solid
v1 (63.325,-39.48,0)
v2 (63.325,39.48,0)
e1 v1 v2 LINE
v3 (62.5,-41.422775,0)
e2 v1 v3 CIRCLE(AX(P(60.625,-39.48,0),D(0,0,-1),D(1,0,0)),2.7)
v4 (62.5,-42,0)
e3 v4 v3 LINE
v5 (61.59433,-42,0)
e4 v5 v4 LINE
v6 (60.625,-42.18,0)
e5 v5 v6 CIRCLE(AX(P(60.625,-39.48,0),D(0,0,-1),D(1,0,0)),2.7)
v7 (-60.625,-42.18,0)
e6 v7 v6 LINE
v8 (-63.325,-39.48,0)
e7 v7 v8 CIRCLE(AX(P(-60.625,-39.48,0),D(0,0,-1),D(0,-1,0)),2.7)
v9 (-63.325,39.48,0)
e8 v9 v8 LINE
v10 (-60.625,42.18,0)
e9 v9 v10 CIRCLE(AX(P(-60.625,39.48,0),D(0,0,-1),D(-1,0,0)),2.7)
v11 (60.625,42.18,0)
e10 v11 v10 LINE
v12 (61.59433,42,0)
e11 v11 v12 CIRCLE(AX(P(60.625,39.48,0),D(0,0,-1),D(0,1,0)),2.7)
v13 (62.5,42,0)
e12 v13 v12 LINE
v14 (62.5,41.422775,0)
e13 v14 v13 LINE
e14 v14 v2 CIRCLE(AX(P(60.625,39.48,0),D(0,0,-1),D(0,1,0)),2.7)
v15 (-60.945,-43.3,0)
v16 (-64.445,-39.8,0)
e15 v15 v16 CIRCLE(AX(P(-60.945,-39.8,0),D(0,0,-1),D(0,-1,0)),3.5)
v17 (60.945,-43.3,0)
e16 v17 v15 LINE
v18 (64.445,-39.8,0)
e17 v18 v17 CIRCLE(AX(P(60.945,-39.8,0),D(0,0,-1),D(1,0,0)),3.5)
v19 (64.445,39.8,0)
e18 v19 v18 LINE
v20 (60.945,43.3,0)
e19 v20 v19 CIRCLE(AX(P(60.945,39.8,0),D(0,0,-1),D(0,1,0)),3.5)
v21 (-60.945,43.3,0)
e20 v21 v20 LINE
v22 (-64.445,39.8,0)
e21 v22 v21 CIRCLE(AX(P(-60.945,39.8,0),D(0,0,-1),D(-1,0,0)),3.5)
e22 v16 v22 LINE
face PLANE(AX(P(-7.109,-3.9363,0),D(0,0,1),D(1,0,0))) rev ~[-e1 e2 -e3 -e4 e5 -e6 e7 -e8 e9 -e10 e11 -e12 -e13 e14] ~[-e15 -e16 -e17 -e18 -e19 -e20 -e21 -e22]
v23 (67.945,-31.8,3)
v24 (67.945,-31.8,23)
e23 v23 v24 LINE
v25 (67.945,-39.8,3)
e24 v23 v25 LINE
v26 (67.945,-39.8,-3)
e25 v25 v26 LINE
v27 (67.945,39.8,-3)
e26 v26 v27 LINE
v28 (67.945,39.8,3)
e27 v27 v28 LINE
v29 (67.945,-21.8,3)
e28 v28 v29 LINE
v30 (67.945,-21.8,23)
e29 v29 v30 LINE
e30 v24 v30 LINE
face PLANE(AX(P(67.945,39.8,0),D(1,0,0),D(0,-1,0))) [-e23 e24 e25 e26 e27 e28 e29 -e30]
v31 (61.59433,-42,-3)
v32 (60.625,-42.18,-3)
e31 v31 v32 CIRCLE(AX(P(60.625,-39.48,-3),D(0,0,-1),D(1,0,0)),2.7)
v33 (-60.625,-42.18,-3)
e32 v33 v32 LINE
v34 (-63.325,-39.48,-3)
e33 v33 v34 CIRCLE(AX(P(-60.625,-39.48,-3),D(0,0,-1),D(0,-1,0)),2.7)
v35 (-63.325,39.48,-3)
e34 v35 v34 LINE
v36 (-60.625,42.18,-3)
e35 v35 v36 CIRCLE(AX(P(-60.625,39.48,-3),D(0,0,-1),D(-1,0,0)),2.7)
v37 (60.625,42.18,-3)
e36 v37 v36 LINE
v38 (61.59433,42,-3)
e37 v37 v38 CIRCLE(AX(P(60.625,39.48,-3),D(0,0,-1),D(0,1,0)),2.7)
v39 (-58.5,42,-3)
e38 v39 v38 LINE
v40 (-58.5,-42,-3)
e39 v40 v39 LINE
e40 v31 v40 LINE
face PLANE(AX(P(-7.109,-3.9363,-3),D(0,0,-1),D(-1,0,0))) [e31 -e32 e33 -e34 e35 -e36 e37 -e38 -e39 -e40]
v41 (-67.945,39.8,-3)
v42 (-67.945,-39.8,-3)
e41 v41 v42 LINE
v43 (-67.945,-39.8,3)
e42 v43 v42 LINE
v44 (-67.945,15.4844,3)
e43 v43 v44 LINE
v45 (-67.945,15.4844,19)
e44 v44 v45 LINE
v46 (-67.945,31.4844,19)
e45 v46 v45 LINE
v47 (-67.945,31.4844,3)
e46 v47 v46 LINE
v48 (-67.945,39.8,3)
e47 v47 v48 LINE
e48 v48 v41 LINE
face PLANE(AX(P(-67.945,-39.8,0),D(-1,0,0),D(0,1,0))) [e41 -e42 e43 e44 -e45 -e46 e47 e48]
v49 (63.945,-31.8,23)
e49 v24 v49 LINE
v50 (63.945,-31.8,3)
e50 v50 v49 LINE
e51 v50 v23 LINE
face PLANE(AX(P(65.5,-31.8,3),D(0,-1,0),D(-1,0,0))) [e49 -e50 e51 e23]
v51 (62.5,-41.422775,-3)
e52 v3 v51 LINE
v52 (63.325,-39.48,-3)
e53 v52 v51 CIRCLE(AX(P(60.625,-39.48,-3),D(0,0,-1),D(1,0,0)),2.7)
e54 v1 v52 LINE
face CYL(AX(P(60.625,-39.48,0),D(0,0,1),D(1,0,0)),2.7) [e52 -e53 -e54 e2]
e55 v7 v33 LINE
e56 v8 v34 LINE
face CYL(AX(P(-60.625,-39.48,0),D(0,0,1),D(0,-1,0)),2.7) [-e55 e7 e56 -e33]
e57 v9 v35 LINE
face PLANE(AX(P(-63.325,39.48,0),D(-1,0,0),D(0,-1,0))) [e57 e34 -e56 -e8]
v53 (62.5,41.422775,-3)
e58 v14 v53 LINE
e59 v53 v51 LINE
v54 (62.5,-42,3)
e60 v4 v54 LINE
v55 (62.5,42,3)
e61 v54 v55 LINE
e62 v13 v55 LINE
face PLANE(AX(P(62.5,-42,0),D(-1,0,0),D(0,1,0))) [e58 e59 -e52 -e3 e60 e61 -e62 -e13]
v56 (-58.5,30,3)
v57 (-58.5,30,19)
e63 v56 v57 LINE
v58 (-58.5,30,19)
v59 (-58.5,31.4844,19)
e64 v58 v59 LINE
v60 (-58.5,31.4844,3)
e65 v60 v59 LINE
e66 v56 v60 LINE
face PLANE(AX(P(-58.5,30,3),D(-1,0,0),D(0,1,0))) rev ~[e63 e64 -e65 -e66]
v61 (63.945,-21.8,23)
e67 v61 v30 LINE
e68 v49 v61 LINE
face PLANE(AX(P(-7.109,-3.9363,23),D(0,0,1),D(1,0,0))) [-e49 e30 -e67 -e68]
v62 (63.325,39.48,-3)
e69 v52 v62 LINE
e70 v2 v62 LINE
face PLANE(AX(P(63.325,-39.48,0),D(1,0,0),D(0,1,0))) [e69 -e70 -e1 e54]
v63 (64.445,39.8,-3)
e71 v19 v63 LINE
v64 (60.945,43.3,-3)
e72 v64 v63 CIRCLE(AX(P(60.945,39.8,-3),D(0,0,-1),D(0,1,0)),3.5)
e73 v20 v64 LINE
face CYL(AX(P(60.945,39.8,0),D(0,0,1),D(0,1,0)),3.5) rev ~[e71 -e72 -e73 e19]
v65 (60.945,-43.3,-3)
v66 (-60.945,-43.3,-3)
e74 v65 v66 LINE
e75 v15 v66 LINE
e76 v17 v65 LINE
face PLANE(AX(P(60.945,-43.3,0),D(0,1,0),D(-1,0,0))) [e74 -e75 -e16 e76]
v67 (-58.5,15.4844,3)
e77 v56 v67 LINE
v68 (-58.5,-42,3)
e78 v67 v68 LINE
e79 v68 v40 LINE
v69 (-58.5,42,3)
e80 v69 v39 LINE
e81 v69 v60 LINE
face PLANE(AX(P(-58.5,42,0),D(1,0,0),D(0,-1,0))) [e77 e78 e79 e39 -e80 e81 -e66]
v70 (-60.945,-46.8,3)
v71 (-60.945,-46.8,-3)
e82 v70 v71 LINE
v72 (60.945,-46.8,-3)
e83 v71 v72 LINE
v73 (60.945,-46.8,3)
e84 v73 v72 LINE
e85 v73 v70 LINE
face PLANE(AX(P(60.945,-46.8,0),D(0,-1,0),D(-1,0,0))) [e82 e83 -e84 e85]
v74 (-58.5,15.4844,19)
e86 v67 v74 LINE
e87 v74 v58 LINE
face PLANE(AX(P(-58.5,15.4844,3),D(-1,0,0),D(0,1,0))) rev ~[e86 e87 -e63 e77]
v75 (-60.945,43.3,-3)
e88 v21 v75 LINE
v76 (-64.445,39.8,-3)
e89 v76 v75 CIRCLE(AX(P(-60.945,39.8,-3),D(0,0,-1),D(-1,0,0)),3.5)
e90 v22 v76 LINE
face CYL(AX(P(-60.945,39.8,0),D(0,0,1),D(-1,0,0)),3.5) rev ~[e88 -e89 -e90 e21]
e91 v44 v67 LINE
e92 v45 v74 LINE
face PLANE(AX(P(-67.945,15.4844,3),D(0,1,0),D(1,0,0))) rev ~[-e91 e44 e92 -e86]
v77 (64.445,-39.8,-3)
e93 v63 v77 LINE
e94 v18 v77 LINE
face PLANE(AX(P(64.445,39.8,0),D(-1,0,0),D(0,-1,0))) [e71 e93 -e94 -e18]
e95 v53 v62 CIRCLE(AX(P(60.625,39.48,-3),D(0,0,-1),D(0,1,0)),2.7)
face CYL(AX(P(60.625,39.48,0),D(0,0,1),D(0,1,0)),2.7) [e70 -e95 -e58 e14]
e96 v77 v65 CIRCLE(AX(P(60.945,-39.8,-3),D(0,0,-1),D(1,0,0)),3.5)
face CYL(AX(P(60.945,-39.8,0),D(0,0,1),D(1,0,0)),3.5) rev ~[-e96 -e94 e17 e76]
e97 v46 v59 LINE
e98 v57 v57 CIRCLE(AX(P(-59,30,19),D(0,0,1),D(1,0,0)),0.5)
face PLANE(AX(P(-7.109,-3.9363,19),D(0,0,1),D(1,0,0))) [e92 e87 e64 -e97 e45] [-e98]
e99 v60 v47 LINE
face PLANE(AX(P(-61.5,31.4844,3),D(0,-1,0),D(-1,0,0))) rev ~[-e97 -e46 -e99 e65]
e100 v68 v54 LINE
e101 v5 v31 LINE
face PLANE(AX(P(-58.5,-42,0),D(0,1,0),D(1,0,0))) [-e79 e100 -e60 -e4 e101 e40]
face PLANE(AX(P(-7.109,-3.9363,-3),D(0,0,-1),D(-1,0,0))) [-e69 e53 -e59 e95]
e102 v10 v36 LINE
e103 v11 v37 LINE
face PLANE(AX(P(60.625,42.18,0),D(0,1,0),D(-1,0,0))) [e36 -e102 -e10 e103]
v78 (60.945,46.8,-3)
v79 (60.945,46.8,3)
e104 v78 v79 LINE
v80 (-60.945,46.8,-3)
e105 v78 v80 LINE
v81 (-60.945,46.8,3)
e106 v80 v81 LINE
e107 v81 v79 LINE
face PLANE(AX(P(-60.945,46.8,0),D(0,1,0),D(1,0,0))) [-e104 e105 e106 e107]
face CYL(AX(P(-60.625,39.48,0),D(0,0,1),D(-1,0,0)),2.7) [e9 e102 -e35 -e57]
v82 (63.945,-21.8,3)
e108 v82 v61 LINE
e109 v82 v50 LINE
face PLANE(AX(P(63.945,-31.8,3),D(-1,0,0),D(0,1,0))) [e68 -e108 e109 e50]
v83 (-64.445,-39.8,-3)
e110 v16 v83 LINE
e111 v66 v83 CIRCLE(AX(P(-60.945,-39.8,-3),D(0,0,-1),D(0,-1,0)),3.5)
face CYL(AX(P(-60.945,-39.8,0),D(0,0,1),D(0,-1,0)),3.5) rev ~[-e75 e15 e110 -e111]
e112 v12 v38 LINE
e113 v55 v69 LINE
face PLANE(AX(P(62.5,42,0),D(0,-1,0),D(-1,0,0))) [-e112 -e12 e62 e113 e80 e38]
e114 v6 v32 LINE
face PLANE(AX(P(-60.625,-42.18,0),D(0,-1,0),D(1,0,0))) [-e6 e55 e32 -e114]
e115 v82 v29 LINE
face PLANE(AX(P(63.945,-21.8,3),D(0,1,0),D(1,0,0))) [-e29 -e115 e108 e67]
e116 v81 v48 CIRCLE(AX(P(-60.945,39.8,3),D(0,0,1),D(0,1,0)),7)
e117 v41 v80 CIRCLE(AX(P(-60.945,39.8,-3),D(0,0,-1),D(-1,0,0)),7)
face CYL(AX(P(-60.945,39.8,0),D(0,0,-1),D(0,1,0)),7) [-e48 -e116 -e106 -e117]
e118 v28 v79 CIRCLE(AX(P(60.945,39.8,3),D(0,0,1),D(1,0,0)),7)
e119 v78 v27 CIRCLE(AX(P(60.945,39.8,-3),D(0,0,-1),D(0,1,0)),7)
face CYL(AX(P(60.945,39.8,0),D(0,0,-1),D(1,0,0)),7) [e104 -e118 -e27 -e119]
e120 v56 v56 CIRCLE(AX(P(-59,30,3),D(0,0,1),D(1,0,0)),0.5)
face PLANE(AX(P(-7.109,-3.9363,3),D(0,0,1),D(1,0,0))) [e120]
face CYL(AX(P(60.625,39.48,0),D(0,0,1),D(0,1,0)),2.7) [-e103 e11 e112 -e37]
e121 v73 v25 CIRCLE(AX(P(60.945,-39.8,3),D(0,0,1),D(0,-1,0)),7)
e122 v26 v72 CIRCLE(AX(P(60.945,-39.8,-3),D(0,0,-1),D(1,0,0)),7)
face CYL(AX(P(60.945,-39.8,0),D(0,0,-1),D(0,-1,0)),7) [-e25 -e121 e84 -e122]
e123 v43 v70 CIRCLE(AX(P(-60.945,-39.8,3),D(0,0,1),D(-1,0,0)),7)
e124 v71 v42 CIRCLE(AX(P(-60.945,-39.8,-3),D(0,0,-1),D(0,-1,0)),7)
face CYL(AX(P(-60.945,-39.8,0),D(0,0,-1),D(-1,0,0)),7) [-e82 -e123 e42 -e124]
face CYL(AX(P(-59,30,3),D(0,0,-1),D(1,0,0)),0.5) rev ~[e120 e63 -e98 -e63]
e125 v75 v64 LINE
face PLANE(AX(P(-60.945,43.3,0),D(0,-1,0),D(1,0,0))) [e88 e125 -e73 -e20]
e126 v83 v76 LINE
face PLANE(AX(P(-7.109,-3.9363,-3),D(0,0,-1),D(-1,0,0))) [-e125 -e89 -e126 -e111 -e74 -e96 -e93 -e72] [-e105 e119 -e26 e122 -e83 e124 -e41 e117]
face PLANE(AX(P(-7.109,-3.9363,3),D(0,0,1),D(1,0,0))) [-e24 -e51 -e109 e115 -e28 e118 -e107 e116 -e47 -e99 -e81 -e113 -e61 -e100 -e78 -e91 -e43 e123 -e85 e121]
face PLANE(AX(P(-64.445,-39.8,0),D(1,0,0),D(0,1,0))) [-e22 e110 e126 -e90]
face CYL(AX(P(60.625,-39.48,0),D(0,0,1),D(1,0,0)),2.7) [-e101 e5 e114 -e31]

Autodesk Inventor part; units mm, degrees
ref_plane "YZ Plane" through (0, 0, 0) normal (1, 0, 0) x (0, 1, 0)
ref_plane "XZ Plane" through (0, 0, 0) normal (0, 1, 0) x (-1, 0, 0)
ref_plane "XY Plane" through (0, 0, 0) normal (0, 0, 1) x (1, 0, 0)
ref_plane "Work Plane1" through (-7.109, -3.9363, 0) normal (0, 0, 1) x (1, 0, 0)
sketch "Sketch1" plane through (-7.109, -3.9363, 0) normal (0, 0, 1) x (1, 0, 0)
  line L0 (71.054, 43.7363) -> (71.054, -35.8637) construction
  arc A0 (71.054, 43.7363) -> (68.054, 46.7363) centre (68.054, 43.7363) ccw construction
  line L1 (-53.836, 46.7363) -> (68.054, 46.7363) construction
  arc A1 (-53.836, 46.7363) -> (-56.836, 43.7363) centre (-53.836, 43.7363) ccw construction
  line L2 (-56.836, -35.8637) -> (-56.836, 43.7363) construction
  arc A2 (-56.836, -35.8637) -> (-53.836, -38.8637) centre (-53.836, -35.8637) ccw construction
  line L3 (68.054, -38.8637) -> (-53.836, -38.8637) construction
  arc A3 (68.054, -38.8637) -> (71.054, -35.8637) centre (68.054, -35.8637) ccw construction
  line L4 (-56.516, -35.5437) -> (-56.516, 43.4163) construction
  arc A4 (-53.516, 46.4163) -> (-56.516, 43.4163) centre (-53.516, 43.4163) ccw construction
  line L5 (-53.516, 46.4163) -> (67.734, 46.4163) construction
  arc A5 (70.734, 43.4163) -> (67.734, 46.4163) centre (67.734, 43.4163) ccw construction
  line L6 (70.734, 43.4163) -> (70.734, -35.5437) construction
  arc A6 (67.734, -38.5437) -> (70.734, -35.5437) centre (67.734, -35.5437) ccw construction
  line L7 (67.734, -38.5437) -> (-53.516, -38.5437) construction
  arc A7 (-56.516, -35.5437) -> (-53.516, -38.5437) centre (-53.516, -35.5437) ccw construction
  arc A8 (75.054, 43.7363) -> (68.054, 50.7363) centre (68.054, 43.7363) ccw
  line L8 (75.054, 43.7363) -> (75.054, -35.8637)
  arc A9 (68.054, -42.8637) -> (75.054, -35.8637) centre (68.054, -35.8637) ccw
  line L9 (68.054, -42.8637) -> (-53.836, -42.8637)
  arc A10 (-60.836, -35.8637) -> (-53.836, -42.8637) centre (-53.836, -35.8637) ccw
  line L10 (-60.836, -35.8637) -> (-60.836, 43.7363)
  arc A11 (-53.836, 50.7363) -> (-60.836, 43.7363) centre (-53.836, 43.7363) ccw
  line L11 (-53.836, 50.7363) -> (68.054, 50.7363)
  circle A12 centre (53.6173, 21.8363) radius 4 construction
  circle A13 centre (53.6173, 3.8363) radius 4 construction
  circle A14 centre (53.6173, -14.1637) radius 4 construction
  circle A15 centre (35.6173, 21.8363) radius 4 construction
  circle A16 centre (35.6173, 3.8363) radius 4 construction
  circle A17 centre (35.6173, -14.1637) radius 4 construction
  circle A18 centre (17.6173, 21.8363) radius 4 construction
  circle A19 centre (17.6173, 3.8363) radius 4 construction
  circle A20 centre (17.6173, -14.1637) radius 4 construction
  circle A21 centre (-0.3827, 21.8363) radius 4 construction
  circle A22 centre (-0.3827, 3.8363) radius 4 construction
  circle A23 centre (-0.3827, -14.1637) radius 4 construction
  circle A24 centre (-18.3827, 21.8363) radius 4 construction
  circle A25 centre (-18.3827, 3.8363) radius 4 construction
  circle A26 centre (-18.3827, -14.1637) radius 4 construction
  circle A27 centre (-36.3827, 21.8363) radius 4 construction
  circle A28 centre (-36.3827, 3.8363) radius 4 construction
  circle A29 centre (-36.3827, -14.1637) radius 4 construction
  circle A30 centre (-36.3827, 30.7863) radius 4.375 construction
  circle A31 centre (-18.3827, 30.7863) radius 4.375 construction
  circle A32 centre (-0.3827, 30.7863) radius 4.375 construction
  circle A33 centre (17.6173, 30.7863) radius 4.375 construction
  circle A34 centre (35.6173, 30.7863) radius 4.375 construction
  circle A35 centre (53.6173, 30.7863) radius 4.375 construction
  circle A36 centre (-36.3827, 12.7863) radius 4.375 construction
  circle A37 centre (-18.3827, 12.7863) radius 4.375 construction
  circle A38 centre (-0.3827, 12.7863) radius 4.375 construction
  circle A39 centre (17.6173, 12.7863) radius 4.375 construction
  circle A40 centre (35.6173, 12.7863) radius 4.375 construction
  circle A41 centre (53.6173, 12.7863) radius 4.375 construction
  circle A42 centre (-36.3827, -5.2137) radius 4.375 construction
  circle A43 centre (-18.3827, -5.2137) radius 4.375 construction
  circle A44 centre (-0.3827, -5.2137) radius 4.375 construction
  circle A45 centre (17.6173, -5.2137) radius 4.375 construction
  circle A46 centre (35.6173, -5.2137) radius 4.375 construction
  circle A47 centre (53.6173, -5.2137) radius 4.375 construction
  circle A48 centre (-36.3827, -23.2137) radius 4.375 construction
  circle A49 centre (-18.3827, -23.2137) radius 4.375 construction
  circle A50 centre (-0.3827, -23.2137) radius 4.375 construction
  circle A51 centre (17.6173, -23.2137) radius 4.375 construction
  circle A52 centre (35.6173, -23.2137) radius 4.375 construction
  circle A53 centre (53.6173, -23.2137) radius 4.375 construction
  arc A54 (57.7361, 42.9363) -> (61.1439, 37.9635) centre (61.609, 41.9363) ccw construction
  line L12 (-39.518, 42.9363) -> (57.7361, 42.9363) construction
  arc A55 (-42.9259, 37.9635) -> (-39.518, 42.9363) centre (-43.391, 41.9363) ccw construction
  arc A56 (-48.391, 33.7282) -> (-42.9259, 37.9635) centre (-46.891, 37.4363) ccw construction
  line L13 (-48.391, -25.8556) -> (-48.391, 33.7282) construction
  arc A57 (-42.9259, -30.0908) -> (-48.391, -25.8556) centre (-46.891, -29.5637) ccw construction
  arc A58 (-39.518, -35.0637) -> (-42.9259, -30.0908) centre (-43.391, -34.0637) ccw construction
  line L14 (57.7361, -35.0637) -> (-39.518, -35.0637) construction
  arc A59 (61.1439, -30.0908) -> (57.7361, -35.0637) centre (61.609, -34.0637) ccw construction
  arc A60 (66.609, -25.8556) -> (61.1439, -30.0908) centre (65.109, -29.5637) ccw construction
  line L15 (66.609, 33.7282) -> (66.609, -25.8556) construction
  arc A61 (61.1439, 37.9635) -> (66.609, 33.7282) centre (65.109, 37.4363) ccw construction
  arc A62 (67.609, -27.9054) -> (62.6207, -31.2394) centre (65.109, -29.5637) ccw construction
  arc A63 (62.6207, -31.2394) -> (59.373, -36.0637) centre (61.609, -34.0637) ccw construction
  line L16 (59.373, -36.0637) -> (-41.1549, -36.0637) construction
  arc A64 (-41.1549, -36.0637) -> (-44.4026, -31.2394) centre (-43.391, -34.0637) ccw construction
  arc A65 (-44.4026, -31.2394) -> (-49.391, -27.9054) centre (-46.891, -29.5637) ccw construction
  line L17 (-49.391, -27.9054) -> (-49.391, 35.778) construction
  arc A66 (-49.391, 35.778) -> (-44.4026, 39.112) centre (-46.891, 37.4363) ccw construction
  arc A67 (-44.4026, 39.112) -> (-41.1549, 43.9363) centre (-43.391, 41.9363) ccw construction
  line L18 (-41.1549, 43.9363) -> (59.373, 43.9363) construction
  arc A68 (59.373, 43.9363) -> (62.6207, 39.112) centre (61.609, 41.9363) ccw construction
  arc A69 (62.6207, 39.112) -> (67.609, 35.778) centre (65.109, 37.4363) ccw construction
  line L19 (67.609, 35.778) -> (67.609, -27.9054) construction
  line L20 (69.609, 45.9363) -> (-51.391, 45.9363)
  line L21 (-51.391, 45.9363) -> (-51.391, -38.0637)
  line L22 (-51.391, -38.0637) -> (69.609, -38.0637)
  line L23 (69.609, -38.0637) -> (69.609, 45.9363)
  point P0 (7.109, 3.9363)
  dimension "d0" = 4
  dimension "d1" = 1
  dimension "d10" = 2
  dimension "d11" = 2
  dimension "d12" = 2
  dimension "d13" = 2
extrude "Extrusion1" add sketch "Sketch1" along normal blind 3
sketch "Sketch2" plane through (-7.109, -3.9363, 0) normal (0, 0, -1) x (-1, 0, 0)
  line L0 (-71.054, 43.7363) -> (-71.054, -35.8637) construction
  arc A0 (-68.054, 46.7363) -> (-71.054, 43.7363) centre (-68.054, 43.7363) ccw construction
  line L1 (53.836, 46.7363) -> (-68.054, 46.7363) construction
  arc A1 (56.836, 43.7363) -> (53.836, 46.7363) centre (53.836, 43.7363) ccw construction
  line L2 (56.836, -35.8637) -> (56.836, 43.7363) construction
  arc A2 (53.836, -38.8637) -> (56.836, -35.8637) centre (53.836, -35.8637) ccw construction
  line L3 (-68.054, -38.8637) -> (53.836, -38.8637) construction
  arc A3 (-71.054, -35.8637) -> (-68.054, -38.8637) centre (-68.054, -35.8637) ccw construction
  line L4 (56.516, -35.5437) -> (56.516, 43.4163) construction
  arc A4 (56.516, 43.4163) -> (53.516, 46.4163) centre (53.516, 43.4163) ccw construction
  line L5 (53.516, 46.4163) -> (-67.734, 46.4163) construction
  arc A5 (-67.734, 46.4163) -> (-70.734, 43.4163) centre (-67.734, 43.4163) ccw construction
  line L6 (-70.734, 43.4163) -> (-70.734, -35.5437) construction
  arc A6 (-70.734, -35.5437) -> (-67.734, -38.5437) centre (-67.734, -35.5437) ccw construction
  line L7 (-67.734, -38.5437) -> (53.516, -38.5437) construction
  arc A7 (53.516, -38.5437) -> (56.516, -35.5437) centre (53.516, -35.5437) ccw construction
  arc A8 (-68.054, 47.2363) -> (-71.554, 43.7363) centre (-68.054, 43.7363) ccw
  line L8 (-71.554, 43.7363) -> (-71.554, -35.8637)
  arc A9 (-71.554, -35.8637) -> (-68.054, -39.3637) centre (-68.054, -35.8637) ccw
  line L9 (-68.054, -39.3637) -> (53.836, -39.3637)
  arc A10 (53.836, -39.3637) -> (57.336, -35.8637) centre (53.836, -35.8637) ccw
  line L10 (57.336, -35.8637) -> (57.336, 43.7363)
  arc A11 (57.336, 43.7363) -> (53.836, 47.2363) centre (53.836, 43.7363) ccw
  line L11 (53.836, 47.2363) -> (-68.054, 47.2363)
  arc A12 (56.216, 43.4163) -> (53.516, 46.1163) centre (53.516, 43.4163) ccw
  line L12 (56.216, 43.4163) -> (56.216, -35.5437)
  arc A13 (53.516, -38.2437) -> (56.216, -35.5437) centre (53.516, -35.5437) ccw
  line L13 (53.516, -38.2437) -> (-67.734, -38.2437)
  arc A14 (-70.434, -35.5437) -> (-67.734, -38.2437) centre (-67.734, -35.5437) ccw
  line L14 (-70.434, -35.5437) -> (-70.434, 43.4163)
  arc A15 (-67.734, 46.1163) -> (-70.434, 43.4163) centre (-67.734, 43.4163) ccw
  line L15 (-67.734, 46.1163) -> (53.516, 46.1163)
  line L16 (-69.609, 45.9363) -> (-69.609, -38.0637) projected
  line L17 (-69.609, -38.0637) -> (51.391, -38.0637) projected
  line L18 (51.391, -38.0637) -> (51.391, 45.9363) projected
  line L19 (51.391, 45.9363) -> (-69.609, 45.9363) projected
  arc A16 (-68.054, 50.7363) -> (-75.054, 43.7363) centre (-68.054, 43.7363) ccw projected
  line L20 (-68.054, 50.7363) -> (53.836, 50.7363) projected
  arc A17 (60.836, 43.7363) -> (53.836, 50.7363) centre (53.836, 43.7363) ccw projected
  line L21 (60.836, 43.7363) -> (60.836, -35.8637) projected
  arc A18 (53.836, -42.8637) -> (60.836, -35.8637) centre (53.836, -35.8637) ccw projected
  line L22 (53.836, -42.8637) -> (-68.054, -42.8637) projected
  arc A19 (-75.054, -35.8637) -> (-68.054, -42.8637) centre (-68.054, -35.8637) ccw projected
  line L23 (-75.054, -35.8637) -> (-75.054, 43.7363) projected
  point P0 (-7.109, 3.9363)
  dimension "d4" = 0.5
  dimension "d5" = 0.3
extrude "Extrusion2" add sketch "Sketch2" along normal blind 3 contours L12 A13 L13 A14 L17 L18 L19 A15 L15 A12 | L16 A14 L14 A15 | L20 A17 L21 A18 L22 A19 L23 A16
sketch "Sketch3" plane through (-7.109, -3.9363, 3) normal (0, 0, 1) x (1, 0, 0)
  line L0 (69.609, 45.9363) -> (69.609, -38.0637) projected
  line L1 (69.609, -38.0637) -> (-51.391, -38.0637) projected
  line L2 (-51.391, -38.0637) -> (-51.391, 45.9363) projected
  line L3 (-51.391, 45.9363) -> (69.609, 45.9363) projected
  arc A0 (75.054, 43.7363) -> (68.054, 50.7363) centre (68.054, 43.7363) ccw projected
  line L4 (68.054, 50.7363) -> (-53.836, 50.7363) projected
  arc A1 (-53.836, 50.7363) -> (-60.836, 43.7363) centre (-53.836, 43.7363) ccw projected
  line L5 (-60.836, 43.7363) -> (-60.836, -35.8637) projected
  arc A2 (-60.836, -35.8637) -> (-53.836, -42.8637) centre (-53.836, -35.8637) ccw projected
  line L6 (-53.836, -42.8637) -> (68.054, -42.8637) projected
  arc A3 (68.054, -42.8637) -> (75.054, -35.8637) centre (68.054, -35.8637) ccw projected
  line L7 (75.054, -35.8637) -> (75.054, 43.7363) projected
  line L8 (75.054, 25.8105) -> (71.9538, 25.8105)
  line L9 (70.434, 43.4163) -> (70.434, -35.5437) projected
  arc A4 (75.054, 43.7363) -> (68.054, 50.7363) centre (68.054, 43.7363) ccw projected
  line L10 (75.054, -27.8637) -> (71.054, -27.8637)
  line L11 (71.054, -27.8637) -> (71.054, -17.8637)
  line L12 (71.054, -17.8637) -> (75.054, -17.8637)
  line L13 (75.054, -17.8637) -> (75.054, -27.8637)
  circle A5 centre (70.109, -26.0637) radius 0.5 projected
  line L14 (67.609, -23.0637) -> (67.609, -29.0637) projected
  line L15 (67.609, -29.0637) -> (72.609, -29.0637) projected
  line L16 (72.609, -23.0637) -> (72.609, -29.0637) projected
  line L17 (67.609, -23.0637) -> (72.609, -23.0637) projected
  point P0 (7.109, 3.9363)
  point P1 (71.7253, 49.6963)
  dimension "d14" = 4
  dimension "d15" = 10
  dimension "d23" = 15
extrude "Extrusion3" add sketch "Sketch3" along normal blind 20 contours L17 L16 L10 L11 | L11 L12 L7 L10 L16 L17
ref_plane "Work Plane2" through (0, -39.8, -3) normal (1, 0, 0) x (0, 0, -1)
sketch "Sketch4" plane through (-7.109, -3.9363, 3) normal (0, 0, 1) x (1, 0, 0)
  arc A0 (75.054, 43.7363) -> (68.054, 50.7363) centre (68.054, 43.7363) ccw projected
  line L0 (68.054, 50.7363) -> (-53.836, 50.7363) projected
  arc A1 (-53.836, 50.7363) -> (-60.836, 43.7363) centre (-53.836, 43.7363) ccw projected
  line L1 (-60.836, 43.7363) -> (-60.836, -35.8637) projected
  arc A2 (-60.836, -35.8637) -> (-53.836, -42.8637) centre (-53.836, -35.8637) ccw projected
  line L2 (-53.836, -42.8637) -> (68.054, -42.8637) projected
  arc A3 (68.054, -42.8637) -> (75.054, -35.8637) centre (68.054, -35.8637) ccw projected
  line L3 (75.054, -17.8637) -> (75.054, 43.7363) projected
  line L4 (71.054, -27.8637) -> (71.054, -17.8637) projected
  line L5 (69.609, 45.9363) -> (69.609, -38.0637) projected
  line L6 (69.609, -38.0637) -> (-51.391, -38.0637) projected
  line L7 (-51.391, -38.0637) -> (-51.391, 45.9363) projected
  line L8 (-51.391, 45.9363) -> (69.609, 45.9363) projected
  circle A4 centre (-51.891, 33.9363) radius 0.5 projected
  line L9 (-49.391, 30.9363) -> (-49.391, 36.9363) projected
  line L10 (-49.391, 36.9363) -> (-54.391, 36.9363) projected
  line L11 (-54.391, 30.9363) -> (-54.391, 36.9363) projected
  line L12 (-49.391, 30.9363) -> (-54.391, 30.9363) projected
  line L13 (-51.391, -38.0637) -> (-51.391, 45.9363) projected
  line L14 (-60.836, -35.8637) -> (-60.836, 43.7363) projected
  line L15 (-51.391, 35.4207) -> (-60.836, 35.4207)
  line L16 (-60.836, 35.4207) -> (-60.836, 19.4207)
  line L17 (-60.836, 19.4207) -> (-51.391, 19.4207)
  line L18 (-51.391, 19.4207) -> (-51.391, 35.4207)
  line L19 (71.054, -17.8637) -> (75.054, -17.8637) projected
  line L20 (75.054, -35.8637) -> (75.054, -27.8637) projected
  line L21 (75.054, -27.8637) -> (71.054, -27.8637) projected
  point P0 (7.109, 3.9363)
  dimension "d20" = 16
extrude "Extrusion4" add sketch "Sketch4" along normal blind 16 contours L15 L11 L12 L7 L17 L1 | L15 L7 L12 L11
equation "\"d10\" = d11"
equation "\"d12\" = d11"
equation "\"d13\" = d11"
properties part number "07_Omnivision_wellplate_traystage"
